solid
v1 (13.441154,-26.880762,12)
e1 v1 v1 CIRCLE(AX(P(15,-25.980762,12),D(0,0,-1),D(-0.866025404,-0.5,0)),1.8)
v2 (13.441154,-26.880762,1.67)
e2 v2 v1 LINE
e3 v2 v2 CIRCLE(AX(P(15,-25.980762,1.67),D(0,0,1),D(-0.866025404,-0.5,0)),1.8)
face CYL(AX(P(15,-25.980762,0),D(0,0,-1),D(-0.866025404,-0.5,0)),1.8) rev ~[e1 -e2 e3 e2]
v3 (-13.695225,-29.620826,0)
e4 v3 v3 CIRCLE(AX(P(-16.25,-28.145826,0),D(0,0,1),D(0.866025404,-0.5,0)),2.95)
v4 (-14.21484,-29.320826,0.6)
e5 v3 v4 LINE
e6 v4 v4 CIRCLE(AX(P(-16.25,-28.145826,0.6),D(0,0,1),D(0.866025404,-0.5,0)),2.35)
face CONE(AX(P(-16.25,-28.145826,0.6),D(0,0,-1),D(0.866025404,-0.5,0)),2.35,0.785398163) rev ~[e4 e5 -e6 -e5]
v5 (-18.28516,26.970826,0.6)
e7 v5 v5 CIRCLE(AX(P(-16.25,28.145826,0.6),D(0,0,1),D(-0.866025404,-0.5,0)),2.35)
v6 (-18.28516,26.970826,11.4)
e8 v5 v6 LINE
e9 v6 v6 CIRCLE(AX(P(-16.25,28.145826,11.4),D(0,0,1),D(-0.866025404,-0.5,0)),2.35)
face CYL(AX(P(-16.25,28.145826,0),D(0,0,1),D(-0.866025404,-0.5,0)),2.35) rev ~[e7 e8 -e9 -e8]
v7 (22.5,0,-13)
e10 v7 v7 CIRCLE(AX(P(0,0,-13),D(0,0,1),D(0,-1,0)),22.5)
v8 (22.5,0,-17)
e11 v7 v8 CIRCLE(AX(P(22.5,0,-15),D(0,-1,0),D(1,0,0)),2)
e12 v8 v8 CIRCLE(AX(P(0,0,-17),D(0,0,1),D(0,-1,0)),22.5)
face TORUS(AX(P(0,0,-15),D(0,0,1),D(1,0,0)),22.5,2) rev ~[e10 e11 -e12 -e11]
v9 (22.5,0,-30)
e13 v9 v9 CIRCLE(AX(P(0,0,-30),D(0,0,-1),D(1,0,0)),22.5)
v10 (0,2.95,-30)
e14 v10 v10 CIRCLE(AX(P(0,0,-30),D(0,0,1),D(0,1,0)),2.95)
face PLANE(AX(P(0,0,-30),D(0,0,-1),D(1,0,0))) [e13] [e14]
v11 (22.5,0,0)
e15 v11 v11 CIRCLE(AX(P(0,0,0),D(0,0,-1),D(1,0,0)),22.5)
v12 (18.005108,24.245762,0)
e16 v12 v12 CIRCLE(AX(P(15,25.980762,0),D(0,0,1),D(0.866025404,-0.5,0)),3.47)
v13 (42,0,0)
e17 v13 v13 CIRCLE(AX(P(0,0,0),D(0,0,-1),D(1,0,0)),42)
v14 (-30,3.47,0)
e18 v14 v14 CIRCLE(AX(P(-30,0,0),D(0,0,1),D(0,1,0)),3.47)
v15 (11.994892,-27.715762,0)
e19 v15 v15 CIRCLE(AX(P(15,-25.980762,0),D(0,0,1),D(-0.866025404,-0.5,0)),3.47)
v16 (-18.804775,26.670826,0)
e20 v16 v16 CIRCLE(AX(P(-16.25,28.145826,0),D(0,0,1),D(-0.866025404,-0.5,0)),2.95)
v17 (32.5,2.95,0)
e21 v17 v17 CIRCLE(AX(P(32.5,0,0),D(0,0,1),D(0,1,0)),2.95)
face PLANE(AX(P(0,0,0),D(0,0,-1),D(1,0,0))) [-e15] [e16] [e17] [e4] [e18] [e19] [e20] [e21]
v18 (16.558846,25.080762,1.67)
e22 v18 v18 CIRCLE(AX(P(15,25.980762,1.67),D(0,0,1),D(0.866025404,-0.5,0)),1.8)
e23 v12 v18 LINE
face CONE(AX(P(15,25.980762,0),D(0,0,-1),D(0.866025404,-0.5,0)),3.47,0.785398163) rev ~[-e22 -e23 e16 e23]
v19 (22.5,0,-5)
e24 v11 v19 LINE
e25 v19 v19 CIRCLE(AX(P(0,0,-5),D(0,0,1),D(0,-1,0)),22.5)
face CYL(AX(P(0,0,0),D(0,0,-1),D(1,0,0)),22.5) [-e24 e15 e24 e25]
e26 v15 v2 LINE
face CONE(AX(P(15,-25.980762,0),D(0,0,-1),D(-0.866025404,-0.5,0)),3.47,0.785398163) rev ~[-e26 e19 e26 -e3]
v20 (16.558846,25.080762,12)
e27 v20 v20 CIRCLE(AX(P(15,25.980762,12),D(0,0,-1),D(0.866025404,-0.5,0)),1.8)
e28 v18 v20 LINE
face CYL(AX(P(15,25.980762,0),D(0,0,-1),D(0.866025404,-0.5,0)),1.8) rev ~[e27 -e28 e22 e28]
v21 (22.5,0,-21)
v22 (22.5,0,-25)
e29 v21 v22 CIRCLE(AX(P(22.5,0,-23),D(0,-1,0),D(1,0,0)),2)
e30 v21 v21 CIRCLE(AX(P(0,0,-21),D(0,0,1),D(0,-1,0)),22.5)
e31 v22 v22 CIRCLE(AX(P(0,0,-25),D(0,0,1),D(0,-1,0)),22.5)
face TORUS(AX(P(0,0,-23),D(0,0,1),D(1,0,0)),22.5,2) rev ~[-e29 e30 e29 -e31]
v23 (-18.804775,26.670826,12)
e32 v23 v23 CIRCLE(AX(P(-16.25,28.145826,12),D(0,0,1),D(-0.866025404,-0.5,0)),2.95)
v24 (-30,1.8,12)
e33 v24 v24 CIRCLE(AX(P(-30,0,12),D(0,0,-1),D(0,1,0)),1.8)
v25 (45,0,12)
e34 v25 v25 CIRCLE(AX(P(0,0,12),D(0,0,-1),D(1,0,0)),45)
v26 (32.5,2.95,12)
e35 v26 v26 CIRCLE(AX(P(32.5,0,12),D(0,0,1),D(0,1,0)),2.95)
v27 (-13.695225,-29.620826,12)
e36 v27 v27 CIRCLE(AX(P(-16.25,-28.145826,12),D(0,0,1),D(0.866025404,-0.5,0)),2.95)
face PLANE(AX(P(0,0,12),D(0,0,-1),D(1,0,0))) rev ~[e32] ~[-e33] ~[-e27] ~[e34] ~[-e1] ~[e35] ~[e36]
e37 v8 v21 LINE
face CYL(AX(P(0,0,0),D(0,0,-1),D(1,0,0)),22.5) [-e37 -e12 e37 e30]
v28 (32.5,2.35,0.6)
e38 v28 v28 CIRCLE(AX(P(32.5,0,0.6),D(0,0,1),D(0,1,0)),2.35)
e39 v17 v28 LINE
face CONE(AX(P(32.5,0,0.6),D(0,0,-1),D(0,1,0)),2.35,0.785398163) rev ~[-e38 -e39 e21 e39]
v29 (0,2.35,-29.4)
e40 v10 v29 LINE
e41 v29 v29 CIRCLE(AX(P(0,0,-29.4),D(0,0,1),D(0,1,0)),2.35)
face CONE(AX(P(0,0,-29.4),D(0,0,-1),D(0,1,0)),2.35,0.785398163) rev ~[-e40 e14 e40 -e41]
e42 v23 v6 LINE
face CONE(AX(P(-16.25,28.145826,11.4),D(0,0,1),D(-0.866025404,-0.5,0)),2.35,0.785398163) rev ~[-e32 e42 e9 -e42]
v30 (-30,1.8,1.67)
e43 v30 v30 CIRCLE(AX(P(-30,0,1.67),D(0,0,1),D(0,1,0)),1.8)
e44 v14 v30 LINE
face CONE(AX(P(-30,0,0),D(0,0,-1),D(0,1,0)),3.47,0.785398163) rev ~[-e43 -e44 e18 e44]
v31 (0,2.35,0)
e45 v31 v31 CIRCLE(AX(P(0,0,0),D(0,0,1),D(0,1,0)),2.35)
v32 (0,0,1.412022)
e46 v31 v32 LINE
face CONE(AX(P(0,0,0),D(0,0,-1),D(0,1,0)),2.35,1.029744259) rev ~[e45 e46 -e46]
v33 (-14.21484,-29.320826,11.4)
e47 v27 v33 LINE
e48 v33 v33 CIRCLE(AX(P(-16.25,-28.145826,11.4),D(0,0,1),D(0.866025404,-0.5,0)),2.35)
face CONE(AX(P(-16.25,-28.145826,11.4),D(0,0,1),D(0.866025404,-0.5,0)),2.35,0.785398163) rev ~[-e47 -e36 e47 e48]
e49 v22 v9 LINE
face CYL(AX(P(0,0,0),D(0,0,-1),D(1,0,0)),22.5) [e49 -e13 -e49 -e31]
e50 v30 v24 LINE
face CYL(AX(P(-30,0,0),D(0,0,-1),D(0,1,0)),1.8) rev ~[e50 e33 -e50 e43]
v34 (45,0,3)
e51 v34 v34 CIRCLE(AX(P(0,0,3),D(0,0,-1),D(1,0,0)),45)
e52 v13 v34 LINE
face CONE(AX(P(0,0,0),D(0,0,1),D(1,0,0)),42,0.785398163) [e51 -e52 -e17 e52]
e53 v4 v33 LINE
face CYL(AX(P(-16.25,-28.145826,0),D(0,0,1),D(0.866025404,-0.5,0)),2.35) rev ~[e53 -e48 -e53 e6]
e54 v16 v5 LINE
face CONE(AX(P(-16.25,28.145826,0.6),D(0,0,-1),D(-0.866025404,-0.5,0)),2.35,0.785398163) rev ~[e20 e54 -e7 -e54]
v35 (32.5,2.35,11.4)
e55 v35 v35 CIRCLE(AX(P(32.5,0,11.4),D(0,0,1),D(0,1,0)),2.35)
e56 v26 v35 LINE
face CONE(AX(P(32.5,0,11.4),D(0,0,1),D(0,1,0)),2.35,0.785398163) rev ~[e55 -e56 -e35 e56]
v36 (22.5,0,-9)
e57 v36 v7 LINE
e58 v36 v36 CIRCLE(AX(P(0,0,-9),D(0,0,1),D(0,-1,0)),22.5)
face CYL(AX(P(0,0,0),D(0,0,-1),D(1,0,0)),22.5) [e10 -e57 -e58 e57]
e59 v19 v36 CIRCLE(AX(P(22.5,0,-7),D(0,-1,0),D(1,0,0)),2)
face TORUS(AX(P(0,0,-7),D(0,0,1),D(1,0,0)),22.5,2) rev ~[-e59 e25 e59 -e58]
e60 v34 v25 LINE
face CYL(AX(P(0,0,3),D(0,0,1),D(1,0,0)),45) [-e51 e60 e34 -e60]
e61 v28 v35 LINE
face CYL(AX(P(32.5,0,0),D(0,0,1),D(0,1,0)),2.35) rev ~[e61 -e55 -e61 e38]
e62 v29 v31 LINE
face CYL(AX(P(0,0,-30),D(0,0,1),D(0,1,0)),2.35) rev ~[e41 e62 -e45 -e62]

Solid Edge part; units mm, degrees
sketch "Sketch1" plane through (0, 0, 0) normal (0, -1, 0) x (1, 0, 0)
  line L0 (42, 0) -> (45, 3)
  line L1 (45, 3) -> (45, 12)
  line L2 (45, 12) -> (0, 12)
  line L3 (22.5, -30) -> (0, -30)
  line L4 (22.5, 0) -> (22.5, -30)
  line L5 (42, 0) -> (22.5, 0)
  dimension "D1" = 3
  dimension "D2" = 3
  dimension "D3" = 12
  dimension "D4" = 30
revolve "RevolvedProtrusion1" add sketch "Sketch1" angle 360 about axis through (0, 0, 12) along (0, 0, -1)
hole "bottem_thread" at (-30, 0, 0) direction (0, 0, 1) diameter 3.6 end up to next countersink diameter 6.94 countersink angle 90
hole "top_thread" at (32.5, 0, 0) direction (0, 0, 1) diameter 4.7 depth 30 tip angle 118 start chamfer 0.6 start chamfer angle 45 end chamfer 0.6 end chamfer angle 45
pattern_circular "Pattern1" count 3 over 360 about axis through (0, 0, 0) along (0, 0, 1) of "bottem_thread", "top_thread"
sketch "Sketch2" plane through (0, 0, 0) normal (0, -1, 0) x (1, 0, 0)
  circle A0 centre (22.5, -15) radius 2
  circle A1 centre (22.5, -23) radius 2
  circle A2 centre (22.5, -7) radius 2
  dimension "D1" = 8
  dimension "D2" = 8
  dimension "D3" = 4
revolve "RevolvedCutout1" cut sketch "Sketch2" angle 360 about axis through (0, 0, 54) along (0, 0, -1)
hole "center_hole" at (0, 0, -30) direction (0, 0, 1) diameter 4.7 depth 30 tip angle 118 start chamfer 0.6 start chamfer angle 45 end chamfer 0.6 end chamfer angle 45
properties part number "DRROLL-2" material "Polypropylene, general purpose"
